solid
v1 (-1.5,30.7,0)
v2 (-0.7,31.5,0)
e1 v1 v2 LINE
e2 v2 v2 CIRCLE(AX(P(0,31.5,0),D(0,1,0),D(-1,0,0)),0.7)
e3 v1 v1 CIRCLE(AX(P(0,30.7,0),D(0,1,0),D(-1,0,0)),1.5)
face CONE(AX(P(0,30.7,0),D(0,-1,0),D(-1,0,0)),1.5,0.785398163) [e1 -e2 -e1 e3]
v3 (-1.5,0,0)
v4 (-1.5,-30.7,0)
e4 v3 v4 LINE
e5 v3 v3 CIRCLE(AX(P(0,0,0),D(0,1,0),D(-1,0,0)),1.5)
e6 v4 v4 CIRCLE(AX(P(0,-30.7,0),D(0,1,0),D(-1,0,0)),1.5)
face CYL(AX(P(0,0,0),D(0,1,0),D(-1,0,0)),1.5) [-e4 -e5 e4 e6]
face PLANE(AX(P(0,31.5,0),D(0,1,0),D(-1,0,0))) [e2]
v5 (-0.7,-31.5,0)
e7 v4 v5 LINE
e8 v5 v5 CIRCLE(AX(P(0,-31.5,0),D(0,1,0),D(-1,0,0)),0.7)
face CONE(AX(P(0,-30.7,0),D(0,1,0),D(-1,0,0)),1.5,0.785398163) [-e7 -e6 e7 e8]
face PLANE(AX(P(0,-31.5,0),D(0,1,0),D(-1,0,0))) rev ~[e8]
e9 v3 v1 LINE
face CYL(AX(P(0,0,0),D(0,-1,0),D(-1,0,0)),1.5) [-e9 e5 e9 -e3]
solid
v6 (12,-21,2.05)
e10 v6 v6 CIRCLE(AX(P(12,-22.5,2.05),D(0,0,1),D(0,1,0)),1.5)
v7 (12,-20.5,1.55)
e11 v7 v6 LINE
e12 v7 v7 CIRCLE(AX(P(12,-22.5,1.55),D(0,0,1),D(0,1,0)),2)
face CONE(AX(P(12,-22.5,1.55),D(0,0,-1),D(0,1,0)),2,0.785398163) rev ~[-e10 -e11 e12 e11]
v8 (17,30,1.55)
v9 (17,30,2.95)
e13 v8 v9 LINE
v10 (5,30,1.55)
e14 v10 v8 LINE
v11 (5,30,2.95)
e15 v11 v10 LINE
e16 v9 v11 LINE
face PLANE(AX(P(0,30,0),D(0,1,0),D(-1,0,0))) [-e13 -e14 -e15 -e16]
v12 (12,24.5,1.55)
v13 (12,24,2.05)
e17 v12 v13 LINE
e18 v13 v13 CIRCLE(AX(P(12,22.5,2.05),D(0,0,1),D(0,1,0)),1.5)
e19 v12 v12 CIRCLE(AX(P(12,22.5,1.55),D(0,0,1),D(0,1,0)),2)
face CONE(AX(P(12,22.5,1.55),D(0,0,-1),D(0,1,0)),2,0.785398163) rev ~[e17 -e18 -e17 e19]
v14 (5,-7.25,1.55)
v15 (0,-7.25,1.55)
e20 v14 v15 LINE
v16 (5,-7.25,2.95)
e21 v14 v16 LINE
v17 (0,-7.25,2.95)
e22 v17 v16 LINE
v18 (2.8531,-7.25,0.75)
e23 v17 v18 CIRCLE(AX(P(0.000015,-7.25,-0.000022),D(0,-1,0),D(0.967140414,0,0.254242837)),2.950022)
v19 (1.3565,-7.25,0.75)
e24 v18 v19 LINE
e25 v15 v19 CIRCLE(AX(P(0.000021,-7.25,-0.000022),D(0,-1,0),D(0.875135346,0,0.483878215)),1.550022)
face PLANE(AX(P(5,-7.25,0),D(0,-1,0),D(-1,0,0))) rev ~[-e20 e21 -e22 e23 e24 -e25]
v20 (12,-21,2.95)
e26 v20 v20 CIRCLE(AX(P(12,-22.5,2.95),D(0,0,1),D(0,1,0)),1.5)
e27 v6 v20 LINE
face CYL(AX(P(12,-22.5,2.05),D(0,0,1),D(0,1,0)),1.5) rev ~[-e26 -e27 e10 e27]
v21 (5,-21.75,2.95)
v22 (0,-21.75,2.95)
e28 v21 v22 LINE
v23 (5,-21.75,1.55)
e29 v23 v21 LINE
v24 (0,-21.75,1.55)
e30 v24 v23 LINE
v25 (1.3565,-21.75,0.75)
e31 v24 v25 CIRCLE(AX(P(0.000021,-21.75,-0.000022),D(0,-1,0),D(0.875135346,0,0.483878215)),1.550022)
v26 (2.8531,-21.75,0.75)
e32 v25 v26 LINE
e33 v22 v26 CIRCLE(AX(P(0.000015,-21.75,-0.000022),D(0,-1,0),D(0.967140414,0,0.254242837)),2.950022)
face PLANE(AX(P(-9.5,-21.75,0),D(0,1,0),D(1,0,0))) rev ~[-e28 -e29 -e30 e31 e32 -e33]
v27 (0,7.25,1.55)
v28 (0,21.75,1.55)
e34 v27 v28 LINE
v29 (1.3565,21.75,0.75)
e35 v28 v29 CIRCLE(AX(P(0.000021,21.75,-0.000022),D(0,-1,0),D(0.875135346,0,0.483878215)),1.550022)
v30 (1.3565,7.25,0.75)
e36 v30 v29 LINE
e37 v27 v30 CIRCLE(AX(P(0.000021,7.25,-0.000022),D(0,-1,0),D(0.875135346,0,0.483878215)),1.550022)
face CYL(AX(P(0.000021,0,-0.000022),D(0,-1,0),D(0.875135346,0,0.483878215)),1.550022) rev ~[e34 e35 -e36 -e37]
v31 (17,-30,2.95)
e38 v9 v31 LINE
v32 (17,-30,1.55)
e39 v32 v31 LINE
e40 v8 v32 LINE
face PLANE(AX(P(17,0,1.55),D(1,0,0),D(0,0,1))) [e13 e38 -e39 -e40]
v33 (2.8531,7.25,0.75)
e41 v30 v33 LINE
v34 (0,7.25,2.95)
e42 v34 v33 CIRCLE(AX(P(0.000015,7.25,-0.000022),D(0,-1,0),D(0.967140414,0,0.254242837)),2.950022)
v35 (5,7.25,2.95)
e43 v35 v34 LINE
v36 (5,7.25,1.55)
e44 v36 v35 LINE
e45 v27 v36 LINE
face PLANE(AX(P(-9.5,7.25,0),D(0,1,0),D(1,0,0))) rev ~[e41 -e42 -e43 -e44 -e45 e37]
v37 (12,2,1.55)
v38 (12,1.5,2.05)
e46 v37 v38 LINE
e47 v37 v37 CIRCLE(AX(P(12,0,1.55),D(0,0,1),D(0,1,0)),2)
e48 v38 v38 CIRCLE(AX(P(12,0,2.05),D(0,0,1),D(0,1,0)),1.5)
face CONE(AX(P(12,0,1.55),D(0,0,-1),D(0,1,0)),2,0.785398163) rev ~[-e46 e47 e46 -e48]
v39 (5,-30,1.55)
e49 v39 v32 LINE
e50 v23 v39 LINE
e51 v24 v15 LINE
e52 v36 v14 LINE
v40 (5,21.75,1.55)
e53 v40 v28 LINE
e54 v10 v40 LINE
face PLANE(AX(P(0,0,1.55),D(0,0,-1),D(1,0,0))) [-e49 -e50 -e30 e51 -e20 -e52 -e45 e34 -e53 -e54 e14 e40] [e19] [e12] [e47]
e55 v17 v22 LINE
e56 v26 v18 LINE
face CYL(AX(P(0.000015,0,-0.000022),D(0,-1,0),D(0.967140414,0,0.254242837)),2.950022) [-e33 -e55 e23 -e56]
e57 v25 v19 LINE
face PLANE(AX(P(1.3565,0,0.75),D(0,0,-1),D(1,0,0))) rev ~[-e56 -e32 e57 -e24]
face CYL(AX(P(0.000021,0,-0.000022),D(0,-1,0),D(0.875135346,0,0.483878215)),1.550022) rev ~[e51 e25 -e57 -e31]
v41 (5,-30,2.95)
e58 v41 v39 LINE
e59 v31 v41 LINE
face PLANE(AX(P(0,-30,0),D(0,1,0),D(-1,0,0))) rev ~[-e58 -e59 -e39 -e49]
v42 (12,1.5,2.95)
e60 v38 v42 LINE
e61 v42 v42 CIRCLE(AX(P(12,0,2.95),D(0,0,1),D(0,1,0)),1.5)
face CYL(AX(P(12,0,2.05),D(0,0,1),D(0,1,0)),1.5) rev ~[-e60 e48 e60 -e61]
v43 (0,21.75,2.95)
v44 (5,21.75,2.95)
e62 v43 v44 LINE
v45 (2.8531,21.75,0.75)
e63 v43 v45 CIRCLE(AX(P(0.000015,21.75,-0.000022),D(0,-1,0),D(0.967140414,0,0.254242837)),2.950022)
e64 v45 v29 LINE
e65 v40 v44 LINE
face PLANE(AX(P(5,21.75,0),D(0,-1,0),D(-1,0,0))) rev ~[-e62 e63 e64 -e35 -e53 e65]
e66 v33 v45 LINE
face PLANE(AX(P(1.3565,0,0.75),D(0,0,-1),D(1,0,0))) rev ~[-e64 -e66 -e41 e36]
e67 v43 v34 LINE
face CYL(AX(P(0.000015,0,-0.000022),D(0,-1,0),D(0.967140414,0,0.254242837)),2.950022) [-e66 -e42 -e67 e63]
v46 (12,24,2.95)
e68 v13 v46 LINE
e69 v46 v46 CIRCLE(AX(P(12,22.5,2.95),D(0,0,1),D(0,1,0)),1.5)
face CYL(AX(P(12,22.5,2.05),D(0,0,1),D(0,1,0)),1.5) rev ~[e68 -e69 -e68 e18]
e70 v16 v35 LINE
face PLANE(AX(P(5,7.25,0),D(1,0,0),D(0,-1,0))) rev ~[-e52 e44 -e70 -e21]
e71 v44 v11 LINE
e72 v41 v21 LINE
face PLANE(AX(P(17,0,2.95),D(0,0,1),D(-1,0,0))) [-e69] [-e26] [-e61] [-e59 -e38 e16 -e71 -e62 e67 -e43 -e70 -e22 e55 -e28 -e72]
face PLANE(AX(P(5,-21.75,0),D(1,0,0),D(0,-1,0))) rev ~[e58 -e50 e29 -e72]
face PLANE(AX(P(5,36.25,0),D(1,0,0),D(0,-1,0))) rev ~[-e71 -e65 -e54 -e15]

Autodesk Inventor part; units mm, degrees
ref_plane "YZ Plane" through (0, 0, 0) normal (1, 0, 0) x (0, 1, 0)
ref_plane "XZ Plane" through (0, 0, 0) normal (0, 1, 0) x (-1, 0, 0)
ref_plane "XY Plane" through (0, 0, 0) normal (0, 0, 1) x (1, 0, 0)
sketch "Skizze1" plane through (0, 0, 0) normal (0, 1, 0) x (-1, 0, 0)
  line L0 (0, 0) -> (0, 79.9753) construction
  line L1 (0, 0) -> (-80.4332, 0) construction
  line L2 (0, 0) -> (80.1339, 0) construction
  line L3 (0, 0) -> (0, -79.3949) construction
  line L4 (0, 1.55) -> (-17, 1.55)
  line L5 (-17, 1.55) -> (-17, 2.95)
  line L6 (-17, 2.95) -> (0, 2.95)
  arc A0 (-1.3565, 0.75) -> (0, 1.55) centre (0, 0) ccw
  arc A1 (-2.8531, 0.75) -> (0, 2.95) centre (0, 0) ccw
  line L7 (-1.3565, 0.75) -> (-2.8531, 0.75)
  circle A2 centre (0, 0) radius 1.5
  dimension "d0" = 1.4
  dimension "d1" = 5.9
  dimension "d2" = 0.8
  dimension "d3" = 19.95
  dimension "d21" = 0.05
  dimension "d27" = 17
extrude "Extrusion1" add sketch "Skizze1" along normal mid plane 60 contours L4 L5 L6 A1 L7 A0
sketch "Skizze3" plane through (0, 0, 0) normal (0, 0, 1) x (1, 0, 0)
  line L0 (5, -7.25) -> (-9.5, -7.25)
  line L1 (-9.5, -7.25) -> (-9.5, 7.25)
  line L2 (-9.5, 7.25) -> (5, 7.25)
  line L3 (5, 7.25) -> (5, -7.25)
  line L4 (17, 30) -> (17, -30) construction
  line L5 (-11.8, 0) -> (21.8, 0) construction
  point P0 (0, 0)
  dimension "d6" = 12
  dimension "d7" = 14.5
  dimension "d8" = 7.25
  dimension "d9" = 14.5
extrude "Extrusion2" cut sketch "Skizze3" along normal through all both and the other way through all
sketch "Skizze4" plane through (17, 30, 1.55) normal (0, 0, -1) x (-1, 0, 0)
  line L0 (17, -72) -> (17, 12) projected
  line L1 (-3.99, -30) -> (23.94, -30) construction
  line L2 (5, -7.5) -> (5, -52.5) construction
  line L3 (0, 0) -> (0, -60) construction
  point P0 (17, -30)
  point P1 (5, -30)
  dimension "d12" = 45
  dimension "d13" = 5
hole "Bohrung1" at (12, 22.5, 1.55) at (12, -22.5, 1.55) at (12, 0, 1.55) direction (0, 0, 1) diameter 3 end through all countersink diameter 4 countersink angle 90
extrude "Extrusion3" add sketch "Skizze1" along normal mid plane 63 separate body contours A2
chamfer "Fase1" distance 0.8 angle 45 2 edges at (1.5, 31.5, 0) (1.5, -31.5, 0)
pattern_linear "Rechteckige Anordnung1" count 3 spacing 29 along (0, 1, 0) of "Extrusion2" first direction both ways yes bodies 1
equation "\"d8\" = 0.5 * d7"
equation "\"d9\" = d7"
properties material "Ms58"
